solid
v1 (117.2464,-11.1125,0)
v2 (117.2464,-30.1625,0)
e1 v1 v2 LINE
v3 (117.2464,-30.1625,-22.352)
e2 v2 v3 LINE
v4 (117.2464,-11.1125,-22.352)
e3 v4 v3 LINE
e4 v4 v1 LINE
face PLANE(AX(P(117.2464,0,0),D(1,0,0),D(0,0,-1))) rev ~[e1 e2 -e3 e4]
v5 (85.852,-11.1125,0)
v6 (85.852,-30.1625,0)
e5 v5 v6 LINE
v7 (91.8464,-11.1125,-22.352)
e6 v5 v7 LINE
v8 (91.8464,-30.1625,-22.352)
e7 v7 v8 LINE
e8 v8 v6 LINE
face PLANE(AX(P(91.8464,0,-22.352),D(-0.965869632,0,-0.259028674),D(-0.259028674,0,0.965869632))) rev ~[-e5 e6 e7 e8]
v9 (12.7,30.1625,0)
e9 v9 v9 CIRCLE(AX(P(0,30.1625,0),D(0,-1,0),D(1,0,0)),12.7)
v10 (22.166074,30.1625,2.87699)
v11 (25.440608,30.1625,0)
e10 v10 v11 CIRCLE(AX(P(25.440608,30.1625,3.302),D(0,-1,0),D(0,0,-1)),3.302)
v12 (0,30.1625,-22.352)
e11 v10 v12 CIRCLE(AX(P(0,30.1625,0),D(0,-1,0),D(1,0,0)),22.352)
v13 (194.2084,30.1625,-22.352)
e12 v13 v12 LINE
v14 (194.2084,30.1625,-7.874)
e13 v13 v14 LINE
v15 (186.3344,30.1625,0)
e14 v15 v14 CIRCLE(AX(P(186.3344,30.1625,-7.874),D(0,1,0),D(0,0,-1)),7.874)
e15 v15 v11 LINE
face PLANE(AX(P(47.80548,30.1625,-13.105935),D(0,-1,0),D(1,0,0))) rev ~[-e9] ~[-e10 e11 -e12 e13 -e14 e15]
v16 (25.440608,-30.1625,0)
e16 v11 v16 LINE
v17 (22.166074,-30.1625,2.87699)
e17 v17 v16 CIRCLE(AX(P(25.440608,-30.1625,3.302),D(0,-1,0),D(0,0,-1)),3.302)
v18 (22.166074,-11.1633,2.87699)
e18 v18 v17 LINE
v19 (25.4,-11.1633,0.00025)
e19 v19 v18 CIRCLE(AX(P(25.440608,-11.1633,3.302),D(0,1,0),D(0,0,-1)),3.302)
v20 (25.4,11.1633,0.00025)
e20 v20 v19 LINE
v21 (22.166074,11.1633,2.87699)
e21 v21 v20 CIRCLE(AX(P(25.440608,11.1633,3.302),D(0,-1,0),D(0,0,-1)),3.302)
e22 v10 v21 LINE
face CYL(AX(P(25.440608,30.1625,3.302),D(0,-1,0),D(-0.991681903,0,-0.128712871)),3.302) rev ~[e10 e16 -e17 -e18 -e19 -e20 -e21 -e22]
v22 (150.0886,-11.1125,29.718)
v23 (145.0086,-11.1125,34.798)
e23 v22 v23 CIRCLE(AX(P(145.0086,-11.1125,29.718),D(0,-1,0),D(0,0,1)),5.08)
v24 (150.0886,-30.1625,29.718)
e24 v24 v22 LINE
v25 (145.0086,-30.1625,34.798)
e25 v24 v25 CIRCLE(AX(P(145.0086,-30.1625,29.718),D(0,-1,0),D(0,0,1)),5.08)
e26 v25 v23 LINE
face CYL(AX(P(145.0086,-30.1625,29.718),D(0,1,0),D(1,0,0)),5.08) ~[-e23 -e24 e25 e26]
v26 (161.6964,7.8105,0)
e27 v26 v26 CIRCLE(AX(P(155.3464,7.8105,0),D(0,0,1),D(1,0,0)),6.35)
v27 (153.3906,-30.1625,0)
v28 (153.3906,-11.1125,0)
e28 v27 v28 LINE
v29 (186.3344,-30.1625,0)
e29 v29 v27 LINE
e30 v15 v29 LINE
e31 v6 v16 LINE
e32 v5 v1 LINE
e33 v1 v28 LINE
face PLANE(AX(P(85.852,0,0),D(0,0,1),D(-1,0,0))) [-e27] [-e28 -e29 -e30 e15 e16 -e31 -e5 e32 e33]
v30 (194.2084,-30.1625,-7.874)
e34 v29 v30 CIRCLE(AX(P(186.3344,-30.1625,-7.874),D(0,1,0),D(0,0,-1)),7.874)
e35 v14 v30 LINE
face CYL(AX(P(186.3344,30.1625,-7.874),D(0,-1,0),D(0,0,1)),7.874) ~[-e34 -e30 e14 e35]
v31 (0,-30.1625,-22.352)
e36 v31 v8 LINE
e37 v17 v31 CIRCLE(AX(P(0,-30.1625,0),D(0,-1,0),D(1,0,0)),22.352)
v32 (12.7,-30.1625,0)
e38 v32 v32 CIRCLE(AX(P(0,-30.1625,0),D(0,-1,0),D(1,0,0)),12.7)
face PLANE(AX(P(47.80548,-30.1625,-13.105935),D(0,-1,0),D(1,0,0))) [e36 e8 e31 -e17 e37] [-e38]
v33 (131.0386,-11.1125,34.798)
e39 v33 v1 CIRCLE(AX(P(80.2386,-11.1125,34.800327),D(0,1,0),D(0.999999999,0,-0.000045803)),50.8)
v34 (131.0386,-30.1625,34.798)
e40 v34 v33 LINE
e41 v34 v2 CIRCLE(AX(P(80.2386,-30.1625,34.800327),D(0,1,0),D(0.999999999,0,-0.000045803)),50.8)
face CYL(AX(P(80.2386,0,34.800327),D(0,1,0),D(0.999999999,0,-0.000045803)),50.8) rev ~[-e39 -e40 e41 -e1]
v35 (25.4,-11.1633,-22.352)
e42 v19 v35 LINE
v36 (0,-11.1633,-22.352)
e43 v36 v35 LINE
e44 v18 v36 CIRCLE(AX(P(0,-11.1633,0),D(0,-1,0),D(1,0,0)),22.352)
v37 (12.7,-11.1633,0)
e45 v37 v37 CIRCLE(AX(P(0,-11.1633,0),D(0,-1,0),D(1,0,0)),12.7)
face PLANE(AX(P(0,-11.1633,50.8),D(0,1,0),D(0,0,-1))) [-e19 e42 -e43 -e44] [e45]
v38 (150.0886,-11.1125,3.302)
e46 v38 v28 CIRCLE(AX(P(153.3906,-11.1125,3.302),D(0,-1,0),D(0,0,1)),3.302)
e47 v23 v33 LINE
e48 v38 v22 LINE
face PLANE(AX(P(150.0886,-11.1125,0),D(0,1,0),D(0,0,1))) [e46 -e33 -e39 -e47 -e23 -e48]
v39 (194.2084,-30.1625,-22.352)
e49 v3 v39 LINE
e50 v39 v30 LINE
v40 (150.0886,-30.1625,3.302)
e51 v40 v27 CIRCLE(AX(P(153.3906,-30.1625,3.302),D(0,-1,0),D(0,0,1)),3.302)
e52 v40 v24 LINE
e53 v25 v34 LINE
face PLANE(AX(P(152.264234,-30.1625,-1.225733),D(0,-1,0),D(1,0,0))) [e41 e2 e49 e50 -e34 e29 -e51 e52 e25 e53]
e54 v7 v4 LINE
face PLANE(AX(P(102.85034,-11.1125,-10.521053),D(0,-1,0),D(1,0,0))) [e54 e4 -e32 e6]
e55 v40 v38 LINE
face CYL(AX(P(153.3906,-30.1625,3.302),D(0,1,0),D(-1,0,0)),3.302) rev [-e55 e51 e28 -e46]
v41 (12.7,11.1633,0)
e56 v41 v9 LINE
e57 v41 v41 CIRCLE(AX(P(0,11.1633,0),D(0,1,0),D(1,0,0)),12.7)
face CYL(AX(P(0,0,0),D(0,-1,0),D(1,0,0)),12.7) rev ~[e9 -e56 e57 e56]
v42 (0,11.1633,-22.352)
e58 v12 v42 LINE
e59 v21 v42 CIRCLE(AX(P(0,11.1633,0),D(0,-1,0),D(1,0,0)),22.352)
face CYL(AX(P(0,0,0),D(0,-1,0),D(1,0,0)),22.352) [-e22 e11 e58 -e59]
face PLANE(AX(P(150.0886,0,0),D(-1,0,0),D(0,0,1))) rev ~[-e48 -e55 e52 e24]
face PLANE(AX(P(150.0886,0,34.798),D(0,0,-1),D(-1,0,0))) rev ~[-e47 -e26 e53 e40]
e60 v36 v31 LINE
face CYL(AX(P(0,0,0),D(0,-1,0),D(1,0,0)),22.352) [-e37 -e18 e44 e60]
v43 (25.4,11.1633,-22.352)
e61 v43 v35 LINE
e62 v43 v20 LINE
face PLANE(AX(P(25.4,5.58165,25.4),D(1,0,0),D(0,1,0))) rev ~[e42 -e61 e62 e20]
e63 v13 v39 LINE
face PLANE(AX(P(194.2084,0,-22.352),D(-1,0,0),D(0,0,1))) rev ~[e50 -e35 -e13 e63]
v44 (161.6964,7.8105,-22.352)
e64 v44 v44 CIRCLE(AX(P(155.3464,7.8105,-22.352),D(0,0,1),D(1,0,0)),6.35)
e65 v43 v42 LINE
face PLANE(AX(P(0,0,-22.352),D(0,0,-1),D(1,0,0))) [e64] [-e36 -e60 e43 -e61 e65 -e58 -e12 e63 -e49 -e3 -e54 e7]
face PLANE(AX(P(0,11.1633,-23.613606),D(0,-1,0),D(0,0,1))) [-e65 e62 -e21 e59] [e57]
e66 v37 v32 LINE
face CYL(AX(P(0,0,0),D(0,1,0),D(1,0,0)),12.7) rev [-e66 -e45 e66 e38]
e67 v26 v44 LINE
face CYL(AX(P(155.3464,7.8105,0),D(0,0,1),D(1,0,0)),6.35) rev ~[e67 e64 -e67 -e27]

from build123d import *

# Parameters (mm, degrees)
F1_DEPTH      = 30.1625
F1_DEPTH_BACK = 30.1625
F2_DEPTH      = 11.1125
F2_DEPTH_BACK = 30.1625
F0_R          = 12.7
F3_DEPTH      = 30.1625
F3_DEPTH_BACK = 30.1625
F4_W          = 41.275
F4_H          = 34.798
F5_DEPTH      = 38.1
F6_W          = 11.1633
F6_H          = 50.8
F7_DEPTH      = 25.4
F7_DEPTH_BACK = 25.4
F8_R          = 6.35
F9_DEPTH      = 25.4
F10_R         = 7.874
F11_R         = 5.08
F12_F1_R      = 3.302
F12_F2_R      = 3.302


with BuildPart() as f1:
    # F0 (on Front) → F1 (new body, two sides)
    with BuildSketch(Plane.XZ) as f1_sk:
        with BuildLine():
            ThreePointArc((131.0386, 34.798), (127.4644153616, 16.0823576341), (117.2464, 0))
            Line((117.2464, 0), (117.2464, -22.352))
            Line((117.2464, -22.352), (194.2084, -22.352))
            Line((194.2084, -22.352), (194.2084, 0))
            Line((194.2084, 0), (150.0886, 0))
            Line((150.0886, 0), (150.0886, 34.798))
            Line((150.0886, 34.798), (131.0386, 34.798))
        make_face()
    extrude(amount=-F1_DEPTH)
    extrude(f1_sk.sketch, amount=F1_DEPTH_BACK)

    # F0 (on Front) → F2 (join, two sides)
    with BuildSketch(Plane.XZ) as f2_sk:
        Polygon((117.2464, 0), (85.852, 0), (91.8464, -22.352), (117.2464, -22.352), align=None)
    extrude(amount=F2_DEPTH)
    extrude(f2_sk.sketch, amount=-F2_DEPTH_BACK)

    # F0 (on Front) → F3 (join, two sides)
    with BuildSketch(Plane.XZ) as f3_sk:
        with BuildLine():
            Line((85.852, 0), (22.352, 0))
            ThreePointArc((22.352, 0), (15.8052507731, -15.8052507731), (0, -22.352))
            Line((0, -22.352), (91.8464, -22.352))
            Line((91.8464, -22.352), (85.852, 0))
        make_face()
        with BuildLine():
            ThreePointArc((0, -22.352), (15.8052507731, -15.8052507731), (22.352, 0))
            ThreePointArc((22.352, 0), (-15.8052507731, 15.8052507731), (0, -22.352))
        make_face()
        Circle(F0_R, mode=Mode.SUBTRACT)
    extrude(amount=F3_DEPTH)
    extrude(f3_sk.sketch, amount=-F3_DEPTH_BACK)

    # F4 (on face) → F5 (cut)
    with BuildSketch(Plane.YZ.offset(150.0886)):
        with Locations((9.525, 17.399)):
            Rectangle(F4_W, F4_H)
    extrude(amount=-F5_DEPTH, mode=Mode.SUBTRACT)

    # F6 (on Right) → F7 (cut, two sides)
    with BuildSketch(Plane.YZ) as f7_sk:
        with Locations((5.58165, 25.4)):
            Rectangle(F6_W, F6_H)
        with Locations((-5.58165, 25.4)):
            Rectangle(F6_W, F6_H)
        Polygon((11.1633, 0), (0, 0), (-11.1633, 0), (-11.1633, -23.6136056483), (11.1633, -23.6136056483), align=None)
    extrude(amount=-F7_DEPTH, mode=Mode.SUBTRACT)
    extrude(f7_sk.sketch, amount=F7_DEPTH_BACK, mode=Mode.SUBTRACT)

    # F8 (on face) → F9 (cut)
    with BuildSketch(Plane.XY):
        with Locations((155.3464, 7.8105)):
            Circle(F8_R)
    extrude(amount=-F9_DEPTH, mode=Mode.SUBTRACT)

    # F10
    f10_edges = [f1.edges().sort_by_distance(p)[0] for p in [
        (194.2084, 0, 0),
    ]]
    fillet(f10_edges, radius=F10_R)

    # F11
    f11_edges = [f1.edges().sort_by_distance(p)[0] for p in [
        (150.0886, -20.6375, 34.798),
    ]]
    fillet(f11_edges, radius=F11_R)

    # F12: fillet of radius 3.302 on 3 edges, made by hand

    # F12_f1
    f12_f1_edges = [f1.edges().sort_by_distance(p)[0] for p in [
        (150.0886, -20.6375, 0),
    ]]
    fillet(f12_f1_edges, radius=F12_F1_R)

    # F12_f2
    f12_f2_edges = [f1.edges().sort_by_distance(p)[0] for p in [
        (22.352, 20.6629, 0),
    ]]
    fillet(f12_f2_edges, radius=F12_F2_R)


solid = f1.part
